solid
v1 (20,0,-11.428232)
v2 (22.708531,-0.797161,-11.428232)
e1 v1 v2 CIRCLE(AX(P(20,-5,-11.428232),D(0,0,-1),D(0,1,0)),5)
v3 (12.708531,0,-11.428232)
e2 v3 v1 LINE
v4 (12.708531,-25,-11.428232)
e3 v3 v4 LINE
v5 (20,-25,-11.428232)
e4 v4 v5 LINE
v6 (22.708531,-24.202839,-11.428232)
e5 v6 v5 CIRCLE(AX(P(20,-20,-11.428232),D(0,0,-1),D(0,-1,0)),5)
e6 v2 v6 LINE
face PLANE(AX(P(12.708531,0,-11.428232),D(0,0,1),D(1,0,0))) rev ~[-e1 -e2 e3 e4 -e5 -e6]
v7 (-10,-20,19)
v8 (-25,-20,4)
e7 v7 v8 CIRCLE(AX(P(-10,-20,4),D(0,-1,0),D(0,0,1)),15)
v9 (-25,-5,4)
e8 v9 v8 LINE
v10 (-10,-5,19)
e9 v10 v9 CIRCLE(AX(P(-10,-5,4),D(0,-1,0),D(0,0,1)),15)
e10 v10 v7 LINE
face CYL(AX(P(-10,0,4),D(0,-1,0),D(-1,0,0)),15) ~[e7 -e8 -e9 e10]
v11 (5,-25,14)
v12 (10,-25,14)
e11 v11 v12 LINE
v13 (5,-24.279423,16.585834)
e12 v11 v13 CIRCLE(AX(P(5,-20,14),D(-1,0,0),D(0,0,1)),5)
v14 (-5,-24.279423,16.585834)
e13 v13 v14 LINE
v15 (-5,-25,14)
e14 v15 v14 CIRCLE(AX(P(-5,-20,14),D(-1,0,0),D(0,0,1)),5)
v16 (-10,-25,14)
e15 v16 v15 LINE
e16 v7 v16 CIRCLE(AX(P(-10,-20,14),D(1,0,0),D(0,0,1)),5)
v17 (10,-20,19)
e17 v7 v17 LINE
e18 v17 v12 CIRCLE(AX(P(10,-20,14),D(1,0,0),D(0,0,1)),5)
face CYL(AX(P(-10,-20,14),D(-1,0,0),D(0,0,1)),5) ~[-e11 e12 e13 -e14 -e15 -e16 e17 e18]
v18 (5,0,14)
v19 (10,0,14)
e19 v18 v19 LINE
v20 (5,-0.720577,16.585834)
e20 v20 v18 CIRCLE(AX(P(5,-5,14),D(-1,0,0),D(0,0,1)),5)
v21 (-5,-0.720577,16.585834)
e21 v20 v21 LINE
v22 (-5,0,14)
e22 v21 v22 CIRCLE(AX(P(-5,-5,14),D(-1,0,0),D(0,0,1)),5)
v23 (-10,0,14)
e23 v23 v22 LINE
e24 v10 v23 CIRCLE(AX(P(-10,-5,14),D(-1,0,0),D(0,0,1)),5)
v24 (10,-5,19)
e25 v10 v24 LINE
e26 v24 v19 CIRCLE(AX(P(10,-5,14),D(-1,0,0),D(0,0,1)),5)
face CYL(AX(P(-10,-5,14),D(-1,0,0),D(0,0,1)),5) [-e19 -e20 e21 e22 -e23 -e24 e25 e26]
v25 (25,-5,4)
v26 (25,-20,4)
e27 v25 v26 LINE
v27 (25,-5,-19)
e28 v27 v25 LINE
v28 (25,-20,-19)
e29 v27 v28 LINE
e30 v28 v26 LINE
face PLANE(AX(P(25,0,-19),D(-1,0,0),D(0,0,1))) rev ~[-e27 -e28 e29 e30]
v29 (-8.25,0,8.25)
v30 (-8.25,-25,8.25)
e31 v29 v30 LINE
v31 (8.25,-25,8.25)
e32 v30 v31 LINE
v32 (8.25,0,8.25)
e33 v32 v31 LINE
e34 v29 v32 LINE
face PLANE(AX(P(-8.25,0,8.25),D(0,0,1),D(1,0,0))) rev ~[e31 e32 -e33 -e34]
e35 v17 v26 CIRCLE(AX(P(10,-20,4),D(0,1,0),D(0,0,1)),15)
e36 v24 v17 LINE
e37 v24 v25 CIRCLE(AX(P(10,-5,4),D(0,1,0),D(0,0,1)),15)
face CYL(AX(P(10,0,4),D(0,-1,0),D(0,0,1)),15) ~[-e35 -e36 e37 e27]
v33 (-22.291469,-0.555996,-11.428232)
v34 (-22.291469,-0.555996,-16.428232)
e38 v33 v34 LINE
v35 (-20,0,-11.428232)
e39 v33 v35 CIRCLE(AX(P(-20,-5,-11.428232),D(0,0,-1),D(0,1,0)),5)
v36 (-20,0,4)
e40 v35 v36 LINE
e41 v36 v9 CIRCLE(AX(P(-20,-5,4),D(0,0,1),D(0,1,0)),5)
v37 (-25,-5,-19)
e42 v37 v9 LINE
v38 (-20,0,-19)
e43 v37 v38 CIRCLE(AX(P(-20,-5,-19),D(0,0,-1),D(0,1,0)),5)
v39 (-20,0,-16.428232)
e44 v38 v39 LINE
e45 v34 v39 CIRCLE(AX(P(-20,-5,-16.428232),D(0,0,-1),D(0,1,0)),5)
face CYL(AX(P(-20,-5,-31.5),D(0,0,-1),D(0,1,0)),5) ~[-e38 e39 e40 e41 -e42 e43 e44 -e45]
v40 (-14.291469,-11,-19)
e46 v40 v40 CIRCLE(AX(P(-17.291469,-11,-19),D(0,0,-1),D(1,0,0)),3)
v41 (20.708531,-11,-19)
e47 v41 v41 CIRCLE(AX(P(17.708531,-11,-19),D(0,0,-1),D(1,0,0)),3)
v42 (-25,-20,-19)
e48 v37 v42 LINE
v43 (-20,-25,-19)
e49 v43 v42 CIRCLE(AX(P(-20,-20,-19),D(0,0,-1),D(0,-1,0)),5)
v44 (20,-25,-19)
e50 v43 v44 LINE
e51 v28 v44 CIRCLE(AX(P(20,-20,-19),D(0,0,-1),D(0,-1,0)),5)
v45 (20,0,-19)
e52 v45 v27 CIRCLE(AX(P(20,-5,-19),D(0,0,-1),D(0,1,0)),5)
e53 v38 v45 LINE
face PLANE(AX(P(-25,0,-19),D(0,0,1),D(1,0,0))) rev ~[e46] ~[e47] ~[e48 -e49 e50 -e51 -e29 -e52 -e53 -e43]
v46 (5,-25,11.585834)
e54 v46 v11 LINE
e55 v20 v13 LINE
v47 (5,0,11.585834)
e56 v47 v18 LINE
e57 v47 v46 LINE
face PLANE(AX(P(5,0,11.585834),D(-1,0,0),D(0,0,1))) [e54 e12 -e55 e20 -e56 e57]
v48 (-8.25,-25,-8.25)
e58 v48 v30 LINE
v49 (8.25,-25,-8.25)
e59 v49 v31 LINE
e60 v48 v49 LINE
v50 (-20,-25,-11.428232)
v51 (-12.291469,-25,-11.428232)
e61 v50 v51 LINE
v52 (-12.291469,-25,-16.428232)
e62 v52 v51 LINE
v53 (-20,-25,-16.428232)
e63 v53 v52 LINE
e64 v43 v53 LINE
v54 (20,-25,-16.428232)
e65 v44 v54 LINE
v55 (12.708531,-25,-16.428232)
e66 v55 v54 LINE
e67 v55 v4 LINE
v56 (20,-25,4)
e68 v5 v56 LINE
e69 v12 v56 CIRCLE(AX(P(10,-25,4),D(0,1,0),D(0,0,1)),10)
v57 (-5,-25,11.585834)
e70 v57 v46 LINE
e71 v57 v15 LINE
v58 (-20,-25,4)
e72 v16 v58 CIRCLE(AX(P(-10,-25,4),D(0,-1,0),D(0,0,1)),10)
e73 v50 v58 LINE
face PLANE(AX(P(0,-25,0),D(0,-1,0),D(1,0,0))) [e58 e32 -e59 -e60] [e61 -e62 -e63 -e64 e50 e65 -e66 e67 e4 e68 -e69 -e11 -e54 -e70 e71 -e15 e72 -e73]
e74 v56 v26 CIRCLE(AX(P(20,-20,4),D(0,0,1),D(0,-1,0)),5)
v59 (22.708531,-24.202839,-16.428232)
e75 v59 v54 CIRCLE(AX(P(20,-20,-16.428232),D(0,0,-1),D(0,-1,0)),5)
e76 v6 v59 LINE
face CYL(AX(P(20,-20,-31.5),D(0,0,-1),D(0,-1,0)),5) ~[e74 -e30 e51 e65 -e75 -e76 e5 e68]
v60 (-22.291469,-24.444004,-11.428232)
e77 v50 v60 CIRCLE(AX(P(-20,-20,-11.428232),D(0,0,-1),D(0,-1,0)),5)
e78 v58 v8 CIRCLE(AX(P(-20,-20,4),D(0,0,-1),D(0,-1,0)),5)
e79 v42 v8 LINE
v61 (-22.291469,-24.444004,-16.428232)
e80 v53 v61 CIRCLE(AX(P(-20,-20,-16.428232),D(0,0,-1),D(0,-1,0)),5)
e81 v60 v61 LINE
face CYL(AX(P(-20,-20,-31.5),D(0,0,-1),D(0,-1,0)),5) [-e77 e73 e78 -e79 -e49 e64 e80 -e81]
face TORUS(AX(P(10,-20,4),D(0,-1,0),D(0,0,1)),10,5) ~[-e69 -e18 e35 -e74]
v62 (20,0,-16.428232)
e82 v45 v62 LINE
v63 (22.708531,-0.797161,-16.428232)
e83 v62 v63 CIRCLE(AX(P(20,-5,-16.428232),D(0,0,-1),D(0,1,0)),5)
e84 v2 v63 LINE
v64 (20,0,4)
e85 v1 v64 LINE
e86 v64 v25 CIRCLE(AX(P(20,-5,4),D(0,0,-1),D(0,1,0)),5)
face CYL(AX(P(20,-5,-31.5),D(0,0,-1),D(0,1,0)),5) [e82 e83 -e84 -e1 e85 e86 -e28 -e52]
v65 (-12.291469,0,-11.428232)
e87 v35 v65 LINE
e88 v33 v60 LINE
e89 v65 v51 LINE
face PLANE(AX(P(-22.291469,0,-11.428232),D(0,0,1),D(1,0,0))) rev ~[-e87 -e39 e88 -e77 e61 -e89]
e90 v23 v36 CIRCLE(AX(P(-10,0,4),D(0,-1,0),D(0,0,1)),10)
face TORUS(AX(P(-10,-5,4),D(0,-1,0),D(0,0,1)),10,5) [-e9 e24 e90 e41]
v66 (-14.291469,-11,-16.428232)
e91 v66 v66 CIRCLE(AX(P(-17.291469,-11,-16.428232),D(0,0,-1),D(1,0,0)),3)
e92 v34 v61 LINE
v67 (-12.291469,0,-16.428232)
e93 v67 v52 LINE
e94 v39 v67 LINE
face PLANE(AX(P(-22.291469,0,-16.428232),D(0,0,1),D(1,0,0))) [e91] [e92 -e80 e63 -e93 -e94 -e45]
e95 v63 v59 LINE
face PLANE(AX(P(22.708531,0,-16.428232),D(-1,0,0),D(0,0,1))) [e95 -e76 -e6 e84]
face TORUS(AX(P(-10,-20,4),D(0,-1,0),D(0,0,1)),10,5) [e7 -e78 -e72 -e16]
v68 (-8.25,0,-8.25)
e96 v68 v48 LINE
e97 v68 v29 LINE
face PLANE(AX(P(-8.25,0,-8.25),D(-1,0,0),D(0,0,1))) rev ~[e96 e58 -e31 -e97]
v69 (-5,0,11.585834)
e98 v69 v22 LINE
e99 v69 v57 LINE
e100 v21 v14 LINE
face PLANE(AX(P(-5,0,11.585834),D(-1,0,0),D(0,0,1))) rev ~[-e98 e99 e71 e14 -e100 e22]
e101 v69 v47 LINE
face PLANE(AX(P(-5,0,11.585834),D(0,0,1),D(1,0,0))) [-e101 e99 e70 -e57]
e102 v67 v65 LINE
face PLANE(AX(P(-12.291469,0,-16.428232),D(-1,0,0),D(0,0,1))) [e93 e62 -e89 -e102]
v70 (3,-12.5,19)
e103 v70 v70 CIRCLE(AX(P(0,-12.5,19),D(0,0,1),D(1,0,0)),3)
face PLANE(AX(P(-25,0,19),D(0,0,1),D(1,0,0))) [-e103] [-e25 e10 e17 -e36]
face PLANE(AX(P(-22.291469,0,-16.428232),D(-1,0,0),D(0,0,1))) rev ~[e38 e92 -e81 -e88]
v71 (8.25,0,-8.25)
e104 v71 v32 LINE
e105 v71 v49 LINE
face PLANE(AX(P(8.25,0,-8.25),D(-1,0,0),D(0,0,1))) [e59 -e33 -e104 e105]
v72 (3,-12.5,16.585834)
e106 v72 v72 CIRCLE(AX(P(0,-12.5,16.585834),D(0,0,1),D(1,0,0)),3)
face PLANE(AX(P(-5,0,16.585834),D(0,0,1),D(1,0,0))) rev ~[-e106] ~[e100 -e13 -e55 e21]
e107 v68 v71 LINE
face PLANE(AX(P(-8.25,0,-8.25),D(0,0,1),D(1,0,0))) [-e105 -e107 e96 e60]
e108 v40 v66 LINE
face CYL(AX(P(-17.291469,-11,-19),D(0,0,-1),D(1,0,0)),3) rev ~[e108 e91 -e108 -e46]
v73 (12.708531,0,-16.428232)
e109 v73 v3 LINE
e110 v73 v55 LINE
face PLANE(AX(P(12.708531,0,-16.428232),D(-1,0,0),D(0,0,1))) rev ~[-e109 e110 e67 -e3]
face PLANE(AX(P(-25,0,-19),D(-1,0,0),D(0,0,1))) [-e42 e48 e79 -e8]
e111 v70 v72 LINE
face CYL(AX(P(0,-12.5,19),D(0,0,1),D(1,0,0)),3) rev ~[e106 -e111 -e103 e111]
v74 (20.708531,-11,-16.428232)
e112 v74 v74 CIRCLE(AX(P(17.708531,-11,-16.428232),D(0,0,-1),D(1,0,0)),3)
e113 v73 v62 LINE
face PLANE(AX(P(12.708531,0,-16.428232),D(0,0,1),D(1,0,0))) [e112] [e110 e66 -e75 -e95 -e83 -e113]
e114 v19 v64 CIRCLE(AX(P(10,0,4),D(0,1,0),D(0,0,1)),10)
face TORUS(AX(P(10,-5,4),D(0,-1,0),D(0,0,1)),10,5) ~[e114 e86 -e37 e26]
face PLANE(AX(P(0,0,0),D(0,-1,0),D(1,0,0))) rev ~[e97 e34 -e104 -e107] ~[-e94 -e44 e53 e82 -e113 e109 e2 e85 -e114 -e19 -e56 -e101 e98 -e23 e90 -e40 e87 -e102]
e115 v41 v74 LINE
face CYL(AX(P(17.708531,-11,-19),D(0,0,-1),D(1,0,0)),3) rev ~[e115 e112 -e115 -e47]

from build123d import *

# Parameters (mm, degrees)
F0_W         = 50
F0_H         = 38
F0_W_2       = 10
F0_H_2       = 5
F0_W_3       = 16.5
F0_H_3       = 16.5
F1_DEPTH     = 25
F2_R         = 3
F3_DEPTH     = 7.4141664952
F4_R         = 3
F5_DEPTH     = 7.571767807
F6_R         = 15
F7_T1_DEPTH  = 35.5
F7_T3_DEPTH  = 20
F7_T6_ANGLE  = 90
F7_T8_ANGLE  = 90
F7_T10_ANGLE = 90
F7_T12_ANGLE = 90


# Not quite as in the source:
# - a fillet or chamfer that OpenCascade refuses, or shapes differently, is made with other operations: its cross-section is extruded or revolved along the edge and cut away or added


with BuildPart() as f1:
    # F0 (on Front) → F1 (new body)
    with BuildSketch(Plane.XZ):
        Rectangle(F0_W, F0_H)
        with Locations((-17.2914686799, -13.928232193)):
            Rectangle(F0_W_2, F0_H_2, mode=Mode.SUBTRACT)
        with Locations((17.7085313201, -13.928232193)):
            Rectangle(F0_W_2, F0_H_2, mode=Mode.SUBTRACT)
        Rectangle(F0_W_3, F0_H_3, mode=Mode.SUBTRACT)
        with Locations((0, 14.0858335048)):
            Rectangle(F0_W_2, F0_H_2, mode=Mode.SUBTRACT)
    extrude(amount=F1_DEPTH)

    # F2 (on face) → F3 (cut, through all)
    with BuildSketch(Plane.XY.offset(19)):
        with Locations((0, -12.5)):
            Circle(F2_R)
    extrude(amount=-F3_DEPTH, mode=Mode.SUBTRACT)

    # F4 (on face) → F5 (cut, through all)
    with BuildSketch(Plane(origin=(0, 0, -19), x_dir=(1, 0, 0), z_dir=(0, 0, -1))):
        with Locations((-17.2914686799, 11)):
            Circle(F4_R)
        with Locations((17.7085313201, 11)):
            Circle(F4_R)
    extrude(amount=-F5_DEPTH, mode=Mode.SUBTRACT)

    # F6
    f6_edges = [f1.edges().sort_by_distance(p)[0] for p in [
        (-25, -12.5, 19),
        (25, -12.5, 19),
    ]]
    fillet(f6_edges, radius=F6_R)

    # F7: fillet of radius 5 on 10 edges, made by hand

    # F7_s2 → F7_t1 (cut)
    with BuildSketch(Plane.XY.offset(-31.5)):
        with BuildLine():
            ThreePointArc((-20, 0), (-23.5355339059, -1.4644660941), (-25, -5))
            Line((-25, -5), (-25, 0))
            Line((-25, 0), (-20, 0))
        make_face()
        with BuildLine():
            ThreePointArc((20, 0), (23.5355339059, -1.4644660941), (25, -5))
            Line((25, -5), (25, 0))
            Line((25, 0), (20, 0))
        make_face()
        with BuildLine():
            ThreePointArc((20, -25), (23.5355339059, -23.5355339059), (25, -20))
            Line((25, -20), (25, -25))
            Line((25, -25), (20, -25))
        make_face()
        with BuildLine():
            ThreePointArc((-20, -25), (-23.5355339059, -23.5355339059), (-25, -20))
            Line((-25, -20), (-25, -25))
            Line((-25, -25), (-20, -25))
        make_face()
    extrude(amount=F7_T1_DEPTH, mode=Mode.SUBTRACT)

    # F7_s4 → F7_t3 (cut)
    with BuildSketch(Plane.YZ.offset(-10)):
        with BuildLine():
            ThreePointArc((-20, 19), (-23.5355339059, 17.5355339059), (-25, 14))
            Line((-25, 14), (-25, 19))
            Line((-25, 19), (-20, 19))
        make_face()
        with BuildLine():
            ThreePointArc((-5, 19), (-1.4644660941, 17.5355339059), (0, 14))
            Line((0, 14), (0, 19))
            Line((0, 19), (-5, 19))
        make_face()
    extrude(amount=F7_T3_DEPTH, mode=Mode.SUBTRACT)

    # F7_s5 → F7_t6 (revolve, cut)
    with BuildSketch(Plane.YZ.offset(-10)):
        with BuildLine():
            ThreePointArc((0, 14), (-1.4644660941, 17.5355339059), (-5, 19))
            Line((-5, 19), (0, 19))
            Line((0, 19), (0, 14))
        make_face()
    revolve(axis=Axis((-10, 0, 4), (0, -1, 0)), revolution_arc=F7_T6_ANGLE, mode=Mode.SUBTRACT)

    # F7_s7 → F7_t8 (revolve, cut)
    with BuildSketch(Plane.YZ.offset(10)):
        with BuildLine():
            ThreePointArc((0, 14), (-1.4644660941, 17.5355339059), (-5, 19))
            Line((-5, 19), (0, 19))
            Line((0, 19), (0, 14))
        make_face()
    revolve(axis=Axis((10, 0, 4), (0, 1, 0)), revolution_arc=F7_T8_ANGLE, mode=Mode.SUBTRACT)

    # F7_s9 → F7_t10 (revolve, cut)
    with BuildSketch(Plane.YZ.offset(10)):
        with BuildLine():
            ThreePointArc((-20, 19), (-23.5355339059, 17.5355339059), (-25, 14))
            Line((-25, 14), (-25, 19))
            Line((-25, 19), (-20, 19))
        make_face()
    revolve(axis=Axis((10, -25, 4), (0, 1, 0)), revolution_arc=F7_T10_ANGLE, mode=Mode.SUBTRACT)

    # F7_s11 → F7_t12 (revolve, cut)
    with BuildSketch(Plane.YZ.offset(-10)):
        with BuildLine():
            ThreePointArc((-20, 19), (-23.5355339059, 17.5355339059), (-25, 14))
            Line((-25, 14), (-25, 19))
            Line((-25, 19), (-20, 19))
        make_face()
    revolve(axis=Axis((-10, -25, 4), (0, -1, 0)), revolution_arc=F7_T12_ANGLE, mode=Mode.SUBTRACT)


solid = f1.part
